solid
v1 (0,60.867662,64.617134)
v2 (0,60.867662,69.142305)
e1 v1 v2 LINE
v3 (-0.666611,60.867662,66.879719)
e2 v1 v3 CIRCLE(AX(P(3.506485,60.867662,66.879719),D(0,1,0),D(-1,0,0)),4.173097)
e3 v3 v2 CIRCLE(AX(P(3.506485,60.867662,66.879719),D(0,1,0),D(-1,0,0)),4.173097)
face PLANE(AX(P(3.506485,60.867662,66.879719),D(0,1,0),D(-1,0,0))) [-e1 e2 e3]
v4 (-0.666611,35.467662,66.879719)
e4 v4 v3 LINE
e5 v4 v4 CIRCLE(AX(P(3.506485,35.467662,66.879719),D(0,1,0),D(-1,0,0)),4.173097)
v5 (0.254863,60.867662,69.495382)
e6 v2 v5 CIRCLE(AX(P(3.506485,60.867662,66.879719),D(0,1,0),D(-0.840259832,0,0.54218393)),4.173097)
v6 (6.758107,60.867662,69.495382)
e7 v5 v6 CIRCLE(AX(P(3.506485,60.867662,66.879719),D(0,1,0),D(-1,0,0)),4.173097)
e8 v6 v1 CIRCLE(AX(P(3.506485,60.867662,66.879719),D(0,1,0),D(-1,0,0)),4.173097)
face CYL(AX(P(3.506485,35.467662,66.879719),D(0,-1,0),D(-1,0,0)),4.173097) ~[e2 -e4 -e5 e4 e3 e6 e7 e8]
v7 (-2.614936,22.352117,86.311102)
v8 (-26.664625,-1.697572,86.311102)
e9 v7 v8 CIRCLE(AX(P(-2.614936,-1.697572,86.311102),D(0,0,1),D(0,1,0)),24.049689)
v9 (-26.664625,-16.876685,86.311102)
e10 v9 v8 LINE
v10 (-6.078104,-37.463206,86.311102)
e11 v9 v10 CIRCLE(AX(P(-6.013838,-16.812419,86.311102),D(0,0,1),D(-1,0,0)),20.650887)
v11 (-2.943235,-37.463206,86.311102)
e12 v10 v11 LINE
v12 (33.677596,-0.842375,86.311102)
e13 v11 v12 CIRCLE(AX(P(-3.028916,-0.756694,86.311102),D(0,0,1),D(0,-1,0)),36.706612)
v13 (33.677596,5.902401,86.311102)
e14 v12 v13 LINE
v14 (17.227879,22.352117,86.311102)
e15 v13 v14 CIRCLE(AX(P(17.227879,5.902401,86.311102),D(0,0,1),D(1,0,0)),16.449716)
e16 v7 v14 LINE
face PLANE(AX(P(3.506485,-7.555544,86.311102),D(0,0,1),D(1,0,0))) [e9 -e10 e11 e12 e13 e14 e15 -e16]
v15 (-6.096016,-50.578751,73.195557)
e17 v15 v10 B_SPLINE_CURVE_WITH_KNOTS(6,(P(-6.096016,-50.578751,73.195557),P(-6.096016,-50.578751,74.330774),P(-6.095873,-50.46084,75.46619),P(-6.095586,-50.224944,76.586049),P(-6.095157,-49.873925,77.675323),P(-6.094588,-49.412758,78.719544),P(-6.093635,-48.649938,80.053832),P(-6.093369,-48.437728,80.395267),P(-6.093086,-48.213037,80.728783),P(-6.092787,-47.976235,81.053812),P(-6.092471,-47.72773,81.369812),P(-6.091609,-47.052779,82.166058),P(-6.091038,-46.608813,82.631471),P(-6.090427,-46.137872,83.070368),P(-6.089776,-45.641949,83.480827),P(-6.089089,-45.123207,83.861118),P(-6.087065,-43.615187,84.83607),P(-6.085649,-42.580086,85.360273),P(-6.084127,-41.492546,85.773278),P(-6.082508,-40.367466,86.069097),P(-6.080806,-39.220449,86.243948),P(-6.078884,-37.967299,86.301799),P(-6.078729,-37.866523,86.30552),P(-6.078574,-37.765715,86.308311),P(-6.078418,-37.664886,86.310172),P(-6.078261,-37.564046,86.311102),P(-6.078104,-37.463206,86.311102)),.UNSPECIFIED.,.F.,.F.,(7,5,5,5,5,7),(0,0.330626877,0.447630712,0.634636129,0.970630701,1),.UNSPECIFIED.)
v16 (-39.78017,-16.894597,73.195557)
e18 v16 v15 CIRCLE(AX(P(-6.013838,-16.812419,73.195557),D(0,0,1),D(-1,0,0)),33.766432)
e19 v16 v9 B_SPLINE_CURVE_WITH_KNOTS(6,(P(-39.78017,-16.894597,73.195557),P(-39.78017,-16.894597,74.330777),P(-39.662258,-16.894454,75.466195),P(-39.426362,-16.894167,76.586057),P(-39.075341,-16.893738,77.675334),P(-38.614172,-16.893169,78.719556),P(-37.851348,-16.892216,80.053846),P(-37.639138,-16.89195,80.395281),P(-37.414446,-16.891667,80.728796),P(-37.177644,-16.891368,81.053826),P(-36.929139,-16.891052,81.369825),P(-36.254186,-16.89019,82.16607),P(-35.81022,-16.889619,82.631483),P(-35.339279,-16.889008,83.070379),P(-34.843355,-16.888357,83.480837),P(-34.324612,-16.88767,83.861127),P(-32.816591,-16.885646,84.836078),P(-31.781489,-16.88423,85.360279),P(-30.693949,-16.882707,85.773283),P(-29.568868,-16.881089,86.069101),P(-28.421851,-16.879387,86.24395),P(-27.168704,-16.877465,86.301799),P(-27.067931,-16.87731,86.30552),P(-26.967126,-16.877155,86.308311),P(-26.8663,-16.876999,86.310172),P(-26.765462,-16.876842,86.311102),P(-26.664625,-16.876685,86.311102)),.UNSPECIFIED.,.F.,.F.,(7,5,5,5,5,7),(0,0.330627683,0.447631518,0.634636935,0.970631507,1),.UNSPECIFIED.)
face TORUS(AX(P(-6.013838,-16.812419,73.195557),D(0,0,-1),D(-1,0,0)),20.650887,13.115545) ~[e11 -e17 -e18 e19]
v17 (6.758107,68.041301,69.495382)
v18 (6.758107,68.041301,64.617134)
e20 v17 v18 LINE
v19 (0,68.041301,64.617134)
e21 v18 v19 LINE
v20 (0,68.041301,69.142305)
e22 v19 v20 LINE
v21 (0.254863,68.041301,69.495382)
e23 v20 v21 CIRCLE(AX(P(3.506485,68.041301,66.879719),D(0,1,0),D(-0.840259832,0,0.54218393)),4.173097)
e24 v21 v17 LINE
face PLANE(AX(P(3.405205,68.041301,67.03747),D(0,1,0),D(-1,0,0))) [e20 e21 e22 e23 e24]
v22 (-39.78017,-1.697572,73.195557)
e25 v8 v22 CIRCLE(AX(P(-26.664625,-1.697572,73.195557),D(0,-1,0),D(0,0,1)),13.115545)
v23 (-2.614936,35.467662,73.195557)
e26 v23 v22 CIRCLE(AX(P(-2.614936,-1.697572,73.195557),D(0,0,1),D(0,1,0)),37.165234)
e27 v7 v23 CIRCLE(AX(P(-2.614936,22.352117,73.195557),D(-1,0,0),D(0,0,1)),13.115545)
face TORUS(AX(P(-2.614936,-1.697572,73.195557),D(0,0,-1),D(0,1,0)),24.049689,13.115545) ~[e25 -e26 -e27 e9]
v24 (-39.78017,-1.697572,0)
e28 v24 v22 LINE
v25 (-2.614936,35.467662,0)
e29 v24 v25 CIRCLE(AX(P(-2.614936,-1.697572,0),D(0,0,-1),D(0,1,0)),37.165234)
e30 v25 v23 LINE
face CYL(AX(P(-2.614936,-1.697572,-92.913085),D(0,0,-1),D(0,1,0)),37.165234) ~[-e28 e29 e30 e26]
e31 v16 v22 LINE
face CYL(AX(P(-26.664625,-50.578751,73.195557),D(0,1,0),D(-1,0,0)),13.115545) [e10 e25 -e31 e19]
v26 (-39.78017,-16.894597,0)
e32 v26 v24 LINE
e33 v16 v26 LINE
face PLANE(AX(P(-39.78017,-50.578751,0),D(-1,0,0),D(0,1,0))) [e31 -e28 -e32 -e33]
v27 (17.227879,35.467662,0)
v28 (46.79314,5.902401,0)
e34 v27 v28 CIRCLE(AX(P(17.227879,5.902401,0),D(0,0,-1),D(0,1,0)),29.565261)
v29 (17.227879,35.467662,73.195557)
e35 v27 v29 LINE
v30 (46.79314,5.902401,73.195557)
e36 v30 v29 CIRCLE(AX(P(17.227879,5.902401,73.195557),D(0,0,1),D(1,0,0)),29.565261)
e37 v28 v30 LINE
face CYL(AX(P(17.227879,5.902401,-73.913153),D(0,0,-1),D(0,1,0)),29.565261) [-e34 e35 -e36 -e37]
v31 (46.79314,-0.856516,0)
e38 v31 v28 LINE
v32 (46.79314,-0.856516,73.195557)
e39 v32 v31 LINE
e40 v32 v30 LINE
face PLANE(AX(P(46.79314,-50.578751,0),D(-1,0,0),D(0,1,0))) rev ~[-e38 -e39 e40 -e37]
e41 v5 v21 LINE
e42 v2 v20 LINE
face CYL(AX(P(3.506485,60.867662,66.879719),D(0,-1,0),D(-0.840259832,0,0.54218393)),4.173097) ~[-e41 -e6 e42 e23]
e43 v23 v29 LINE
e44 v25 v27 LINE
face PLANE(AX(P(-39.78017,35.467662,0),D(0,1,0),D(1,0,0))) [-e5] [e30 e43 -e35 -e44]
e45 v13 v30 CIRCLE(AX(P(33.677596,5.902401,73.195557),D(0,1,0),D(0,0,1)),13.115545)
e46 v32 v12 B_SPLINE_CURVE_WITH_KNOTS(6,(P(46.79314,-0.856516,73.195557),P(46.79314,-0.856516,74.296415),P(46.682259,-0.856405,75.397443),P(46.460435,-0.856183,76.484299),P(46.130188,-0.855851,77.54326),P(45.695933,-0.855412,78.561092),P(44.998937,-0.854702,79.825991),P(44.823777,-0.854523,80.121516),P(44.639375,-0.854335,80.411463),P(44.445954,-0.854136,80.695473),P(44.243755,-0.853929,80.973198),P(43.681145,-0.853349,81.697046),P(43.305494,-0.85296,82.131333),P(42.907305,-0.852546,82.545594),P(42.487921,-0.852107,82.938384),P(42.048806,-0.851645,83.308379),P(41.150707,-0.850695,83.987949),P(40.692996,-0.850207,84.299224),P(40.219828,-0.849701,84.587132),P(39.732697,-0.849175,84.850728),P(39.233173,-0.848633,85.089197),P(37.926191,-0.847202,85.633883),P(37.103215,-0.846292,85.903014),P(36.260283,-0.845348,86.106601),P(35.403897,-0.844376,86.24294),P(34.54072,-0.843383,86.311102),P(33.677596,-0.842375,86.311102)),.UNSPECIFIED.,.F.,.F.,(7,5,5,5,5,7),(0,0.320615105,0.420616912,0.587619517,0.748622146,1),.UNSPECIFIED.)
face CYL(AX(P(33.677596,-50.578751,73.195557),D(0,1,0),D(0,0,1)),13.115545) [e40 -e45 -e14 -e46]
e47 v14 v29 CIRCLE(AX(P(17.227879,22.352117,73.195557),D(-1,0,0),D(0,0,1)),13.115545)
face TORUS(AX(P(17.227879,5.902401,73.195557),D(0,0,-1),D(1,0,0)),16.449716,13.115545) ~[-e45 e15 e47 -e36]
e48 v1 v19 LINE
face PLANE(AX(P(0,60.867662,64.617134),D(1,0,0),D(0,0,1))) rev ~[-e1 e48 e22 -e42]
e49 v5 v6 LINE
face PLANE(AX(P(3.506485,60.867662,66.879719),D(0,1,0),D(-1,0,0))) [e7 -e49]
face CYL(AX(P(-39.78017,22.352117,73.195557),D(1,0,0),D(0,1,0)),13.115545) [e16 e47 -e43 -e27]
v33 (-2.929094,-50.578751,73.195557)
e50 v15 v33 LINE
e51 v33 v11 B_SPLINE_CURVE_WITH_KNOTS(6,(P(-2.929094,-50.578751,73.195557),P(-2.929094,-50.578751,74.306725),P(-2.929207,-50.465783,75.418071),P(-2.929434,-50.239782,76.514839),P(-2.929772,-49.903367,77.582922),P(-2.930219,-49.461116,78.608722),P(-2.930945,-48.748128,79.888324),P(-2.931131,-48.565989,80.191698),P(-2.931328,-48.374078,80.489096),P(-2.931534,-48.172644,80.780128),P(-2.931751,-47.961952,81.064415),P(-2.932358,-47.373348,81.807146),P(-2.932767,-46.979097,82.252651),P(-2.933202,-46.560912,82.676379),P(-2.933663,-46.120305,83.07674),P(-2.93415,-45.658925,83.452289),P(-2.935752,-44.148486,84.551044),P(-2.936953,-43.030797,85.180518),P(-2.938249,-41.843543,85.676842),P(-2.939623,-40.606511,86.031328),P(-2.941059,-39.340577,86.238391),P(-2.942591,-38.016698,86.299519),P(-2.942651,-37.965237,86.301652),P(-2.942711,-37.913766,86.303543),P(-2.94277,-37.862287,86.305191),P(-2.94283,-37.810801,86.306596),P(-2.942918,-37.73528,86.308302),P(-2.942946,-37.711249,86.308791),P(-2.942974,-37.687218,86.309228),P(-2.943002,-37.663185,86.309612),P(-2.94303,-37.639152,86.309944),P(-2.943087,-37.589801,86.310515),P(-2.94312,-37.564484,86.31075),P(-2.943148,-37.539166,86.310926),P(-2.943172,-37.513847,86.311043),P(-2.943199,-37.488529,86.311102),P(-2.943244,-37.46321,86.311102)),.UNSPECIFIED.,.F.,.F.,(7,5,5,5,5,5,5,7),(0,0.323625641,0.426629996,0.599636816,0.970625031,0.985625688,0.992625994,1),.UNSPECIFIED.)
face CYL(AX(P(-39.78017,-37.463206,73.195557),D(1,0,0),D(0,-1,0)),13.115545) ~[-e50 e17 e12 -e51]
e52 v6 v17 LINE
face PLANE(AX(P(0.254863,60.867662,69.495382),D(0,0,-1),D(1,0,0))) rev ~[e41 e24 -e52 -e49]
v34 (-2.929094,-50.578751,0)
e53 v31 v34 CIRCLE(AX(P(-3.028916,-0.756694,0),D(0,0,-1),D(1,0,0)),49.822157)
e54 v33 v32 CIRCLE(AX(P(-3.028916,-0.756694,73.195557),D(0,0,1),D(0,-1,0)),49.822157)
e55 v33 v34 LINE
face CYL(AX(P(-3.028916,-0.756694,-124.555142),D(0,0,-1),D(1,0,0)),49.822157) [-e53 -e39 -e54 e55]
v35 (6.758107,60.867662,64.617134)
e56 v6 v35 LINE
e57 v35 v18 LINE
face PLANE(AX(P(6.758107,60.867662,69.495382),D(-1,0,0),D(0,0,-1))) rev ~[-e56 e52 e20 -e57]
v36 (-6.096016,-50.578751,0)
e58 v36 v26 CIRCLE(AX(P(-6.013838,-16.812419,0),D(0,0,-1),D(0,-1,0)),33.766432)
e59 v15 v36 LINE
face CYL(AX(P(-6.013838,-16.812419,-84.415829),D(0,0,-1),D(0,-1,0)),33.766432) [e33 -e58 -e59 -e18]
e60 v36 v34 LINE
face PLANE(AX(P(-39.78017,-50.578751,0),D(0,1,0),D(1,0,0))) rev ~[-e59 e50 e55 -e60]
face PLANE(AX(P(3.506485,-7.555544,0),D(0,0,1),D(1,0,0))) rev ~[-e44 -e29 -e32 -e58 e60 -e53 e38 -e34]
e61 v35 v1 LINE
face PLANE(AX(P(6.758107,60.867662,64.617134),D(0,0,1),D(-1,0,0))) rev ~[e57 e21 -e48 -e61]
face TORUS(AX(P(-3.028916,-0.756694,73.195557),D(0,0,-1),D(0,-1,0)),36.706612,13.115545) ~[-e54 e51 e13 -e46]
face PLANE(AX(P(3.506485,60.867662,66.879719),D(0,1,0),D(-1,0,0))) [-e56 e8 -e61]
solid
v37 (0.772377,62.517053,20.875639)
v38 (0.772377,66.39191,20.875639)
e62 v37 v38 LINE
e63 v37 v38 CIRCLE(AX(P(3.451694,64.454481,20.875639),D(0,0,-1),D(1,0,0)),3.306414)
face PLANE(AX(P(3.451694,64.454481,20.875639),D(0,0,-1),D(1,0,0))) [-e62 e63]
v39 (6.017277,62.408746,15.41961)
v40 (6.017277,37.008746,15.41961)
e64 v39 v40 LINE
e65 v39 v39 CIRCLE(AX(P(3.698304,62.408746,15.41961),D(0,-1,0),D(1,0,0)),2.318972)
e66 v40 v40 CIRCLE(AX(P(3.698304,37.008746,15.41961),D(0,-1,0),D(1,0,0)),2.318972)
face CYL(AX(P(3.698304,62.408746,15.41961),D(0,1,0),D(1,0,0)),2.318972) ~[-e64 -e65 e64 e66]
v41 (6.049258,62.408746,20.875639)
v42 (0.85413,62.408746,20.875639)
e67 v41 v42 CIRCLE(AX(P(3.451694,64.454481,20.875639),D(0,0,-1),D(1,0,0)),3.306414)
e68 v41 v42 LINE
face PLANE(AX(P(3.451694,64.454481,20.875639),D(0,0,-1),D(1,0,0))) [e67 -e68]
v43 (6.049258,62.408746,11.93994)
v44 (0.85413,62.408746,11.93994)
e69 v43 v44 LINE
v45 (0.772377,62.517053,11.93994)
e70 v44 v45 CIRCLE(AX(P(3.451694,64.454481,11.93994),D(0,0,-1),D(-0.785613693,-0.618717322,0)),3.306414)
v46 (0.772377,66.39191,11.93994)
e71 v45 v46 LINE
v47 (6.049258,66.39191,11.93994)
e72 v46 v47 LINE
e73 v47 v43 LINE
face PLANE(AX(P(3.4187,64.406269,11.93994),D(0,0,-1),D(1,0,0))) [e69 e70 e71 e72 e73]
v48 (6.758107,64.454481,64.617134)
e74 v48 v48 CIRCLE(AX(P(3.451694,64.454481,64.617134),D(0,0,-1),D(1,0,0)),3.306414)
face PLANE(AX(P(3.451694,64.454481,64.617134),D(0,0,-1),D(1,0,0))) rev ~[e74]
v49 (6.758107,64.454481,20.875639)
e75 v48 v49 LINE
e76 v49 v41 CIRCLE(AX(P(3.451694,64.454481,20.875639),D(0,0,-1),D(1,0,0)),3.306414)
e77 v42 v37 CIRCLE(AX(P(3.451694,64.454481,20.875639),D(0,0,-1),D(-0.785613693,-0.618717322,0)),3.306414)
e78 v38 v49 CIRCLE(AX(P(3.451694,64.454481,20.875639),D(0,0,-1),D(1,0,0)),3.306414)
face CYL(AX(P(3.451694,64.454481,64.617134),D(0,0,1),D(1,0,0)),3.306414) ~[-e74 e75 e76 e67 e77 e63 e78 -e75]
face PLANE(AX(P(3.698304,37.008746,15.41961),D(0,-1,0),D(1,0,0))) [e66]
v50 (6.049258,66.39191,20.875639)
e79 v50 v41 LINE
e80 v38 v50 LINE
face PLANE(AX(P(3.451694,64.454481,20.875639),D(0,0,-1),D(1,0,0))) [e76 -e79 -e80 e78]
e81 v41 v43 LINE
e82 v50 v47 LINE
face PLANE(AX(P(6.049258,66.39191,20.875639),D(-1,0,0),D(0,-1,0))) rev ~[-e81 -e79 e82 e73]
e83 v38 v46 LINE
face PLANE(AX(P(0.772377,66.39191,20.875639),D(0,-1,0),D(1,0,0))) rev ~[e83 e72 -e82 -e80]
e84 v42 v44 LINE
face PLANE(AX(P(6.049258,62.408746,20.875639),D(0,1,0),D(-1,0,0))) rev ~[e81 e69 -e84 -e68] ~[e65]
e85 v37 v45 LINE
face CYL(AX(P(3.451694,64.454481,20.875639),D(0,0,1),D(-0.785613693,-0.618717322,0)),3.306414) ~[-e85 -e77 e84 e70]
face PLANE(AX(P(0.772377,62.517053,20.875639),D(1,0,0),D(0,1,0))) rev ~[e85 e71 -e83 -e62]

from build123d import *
from build123d import SkipClean  # not in build123d's __all__

# Parameters (mm, degrees)
F0_W         = 86.5733101964
F0_H         = 86.0464125872
F1_DEPTH     = 86.3111019135
F2_R         = 4.1730965083
F3_DEPTH     = 25.4
F5_DEPTH     = 7.1736387908
F6_R         = 3.3064136906
F7_DEPTH     = 43.7414944172
F9_DEPTH     = 8.9356992394
F10_R        = 2.3189722618
F11_DEPTH    = 25.4
F12_R        = 13.1155446623
F13_T1_DEPTH = 160.2242547154
F13_T4_ANGLE = 90
F14_T1_DEPTH = 179.2241870522
F14_T4_ANGLE = 90
F15_T1_DEPTH = 210.8662437018
F15_T4_ANGLE = 90
F16_T1_DEPTH = 170.7269310844
F16_T4_ANGLE = 90


# Not quite as in the source:
# - a fillet or chamfer that OpenCascade refuses, or shapes differently, is made with other operations: its cross-section is extruded or revolved along the edge and cut away or added


with BuildPart() as f1:
    # F0 (on Top) → F1 (new body)
    with BuildSketch(Plane.XY):
        with Locations((3.5064853728, -7.5555443764)):
            Rectangle(F0_W, F0_H)
    extrude(amount=F1_DEPTH)

    # F2 (on face) → F3 (join)
    with BuildSketch(Plane(origin=(0, 35.4676619172, 0), x_dir=(-1, 0, 0), z_dir=(0, 1, 0))):
        with Locations((-3.5064853728, 66.8797194958)):
            Circle(F2_R)
    extrude(amount=F3_DEPTH)

    # F4 (on face) → F5 (join)
    with BuildSketch(Plane(origin=(0, 60.8676619172, 0), x_dir=(-1, 0, 0), z_dir=(0, 1, 0))):
        with BuildLine():
            Line((-0.2548632519, 69.4953815632), (-6.7581074936, 69.4953815632))
            Line((-6.7581074936, 69.4953815632), (-6.7581074936, 64.6171336304))
            Line((-6.7581074936, 64.6171336304), (0, 64.6171336304))
            Line((0, 64.6171336304), (0, 69.1423053611))
            ThreePointArc((0, 69.1423053611), (-0.1228231667, 69.3221700158), (-0.2548632519, 69.4953815632))
        make_face()
    extrude(amount=F5_DEPTH)

    # F12
    f12_edges = [f1.edges().sort_by_distance(p)[0] for p in [
        (3.506485, 35.467662, 86.311102),
        (-39.78017, -7.555544, 86.311102),
        (3.506485, -50.578751, 86.311102),
        (46.79314, -7.555544, 86.311102),
    ]]
    fillet(f12_edges, radius=F12_R)

    # F13: fillet of radius 29.5652611208 on 1 edges, made by hand

    # F13_s2 → F13_t1 (cut)
    with BuildSketch(Plane.XY.offset(-73.9131528019)):
        with BuildLine():
            ThreePointArc((17.2278793502, 35.4676619172), (38.1336759763, 26.8081974225), (46.793140471, 5.9024007964))
            Line((46.793140471, 5.9024007964), (46.793140471, 35.4676619172))
            Line((46.793140471, 35.4676619172), (17.2278793502, 35.4676619172))
        make_face()
    extrude(amount=F13_T1_DEPTH, mode=Mode.SUBTRACT)

    # F13_s3 → F13_t4 (revolve, cut)
    with BuildSketch(Plane.XZ.offset(-5.9024007964)):
        with BuildLine():
            ThreePointArc((33.6775958086, 86.3111019135), (42.9516863783, 82.4696478208), (46.793140471, 73.1955572511))
            Line((46.793140471, 73.1955572511), (46.793140471, 86.3111019135))
            Line((46.793140471, 86.3111019135), (33.6775958086, 86.3111019135))
        make_face()
    revolve(axis=Axis((17.2278793502, 5.9024007964, 86.3111019135), (0, 0, 1)), revolution_arc=F13_T4_ANGLE, mode=Mode.SUBTRACT)

    # F14: fillet of radius 37.1652340555 on 1 edges, made by hand

    # F14_s2 → F14_t1 (cut)
    with BuildSketch(Plane.XY.offset(-92.9130851387)):
        with BuildLine():
            ThreePointArc((-2.6149356699, 35.4676619172), (-28.8947246949, 24.5822168867), (-39.7801697254, -1.6975721383))
            Line((-39.7801697254, -1.6975721383), (-39.7801697254, 35.4676619172))
            Line((-39.7801697254, 35.4676619172), (-2.6149356699, 35.4676619172))
        make_face()
    extrude(amount=F14_T1_DEPTH, mode=Mode.SUBTRACT)

    # F14_s3 → F14_t4 (revolve, cut)
    with BuildSketch(Plane.YZ.offset(-2.6149356699)):
        with BuildLine():
            ThreePointArc((22.3521172549, 86.3111019135), (31.6262078246, 82.4696478208), (35.4676619172, 73.1955572511))
            Line((35.4676619172, 73.1955572511), (35.4676619172, 86.3111019135))
            Line((35.4676619172, 86.3111019135), (22.3521172549, 86.3111019135))
        make_face()
    with SkipClean():  # cleaning this boolean's faces spoils the solid; the shape is the same uncleaned
        revolve(axis=Axis((-2.6149356699, -1.6975721383, 86.3111019135), (0, 0, 1)), revolution_arc=F14_T4_ANGLE, mode=Mode.SUBTRACT)

    # F15: fillet of radius 49.8221567152 on 1 edges, made by hand

    # F15_s2 → F15_t1 (cut)
    with BuildSketch(Plane.XY.offset(-124.5551417884)):
        with BuildLine():
            ThreePointArc((46.793240471, -0.7566939547), (32.2006686224, -35.9862788214), (-3.0289162443, -50.57885067))
            Line((-3.0289162443, -50.57885067), (-3.0289162443, -51.5752938043))
            ThreePointArc((-3.0289162443, -51.5752938043), (21.8821121134, -51.5751938043), (46.793140471, -51.5751938043))
            Line((46.793140471, -51.5751938043), (47.7895836053, -50.57875067))
            ThreePointArc((47.7895836053, -50.57875067), (47.7895836053, -25.6677223123), (47.7896836053, -0.7566939547))
            Line((47.7896836053, -0.7566939547), (46.793240471, -0.7566939547))
        make_face()
    extrude(amount=F15_T1_DEPTH, mode=Mode.SUBTRACT)

    # F15_s3 → F15_t4 (revolve, cut)
    with BuildSketch(Plane.YZ.offset(-3.0289162443)):
        with BuildLine():
            ThreePointArc((-37.4633060076, 86.3111019135), (-46.7373965773, 82.4696478208), (-50.57885067, 73.1955572511))
            Line((-50.57885067, 73.1955572511), (-50.57885067, 86.3111019135))
            Line((-50.57885067, 86.3111019135), (-37.4633060076, 86.3111019135))
        make_face()
    revolve(axis=Axis((-3.0289162443, -0.7566939547, 86.3111019135), (0, 0, 1)), revolution_arc=F15_T4_ANGLE, mode=Mode.SUBTRACT)

    # F16: fillet of radius 33.7664316682 on 1 edges, made by hand

    # F16_s2 → F16_t1 (cut)
    with BuildSketch(Plane.XY.offset(-84.415829171)):
        with BuildLine():
            ThreePointArc((-6.0138380572, -50.57885067), (-29.8903108663, -40.6888918108), (-39.7802697254, -16.8124190017))
            Line((-39.7802697254, -16.8124190017), (-40.4555983588, -16.8124190017))
            ThreePointArc((-40.4555983588, -16.8124190017), (-40.4554983588, -33.6955848358), (-40.4554983588, -50.57875067))
            Line((-40.4554983588, -50.57875067), (-39.7801697254, -51.2540793033))
            ThreePointArc((-39.7801697254, -51.2540793033), (-22.8970038913, -51.2540793033), (-6.0138380572, -51.2541793033))
            Line((-6.0138380572, -51.2541793033), (-6.0138380572, -50.57885067))
        make_face()
    extrude(amount=F16_T1_DEPTH, mode=Mode.SUBTRACT)

    # F16_s3 → F16_t4 (revolve, cut)
    with BuildSketch(Plane.XZ.offset(16.8124190017)):
        with BuildLine():
            ThreePointArc((-26.6647250631, 86.3111019135), (-35.9388156328, 82.4696478208), (-39.7802697254, 73.1955572511))
            Line((-39.7802697254, 73.1955572511), (-39.7802697254, 86.3111019135))
            Line((-39.7802697254, 86.3111019135), (-26.6647250631, 86.3111019135))
        make_face()
    revolve(axis=Axis((-6.0138380572, -16.8124190017, 86.3111019135), (0, 0, 1)), revolution_arc=F16_T4_ANGLE, mode=Mode.SUBTRACT)


with BuildPart() as f7:
    # F6 (on face) → F7 (new body)
    with BuildSketch(Plane(origin=(0, 0, 64.6171336304), x_dir=(1, 0, 0), z_dir=(0, 0, -1))):
        with Locations((3.4516938031, -64.4544813126)):
            Circle(F6_R)
    extrude(amount=F7_DEPTH)

    # F8 (on face) → F9 (join)
    with BuildSketch(Plane(origin=(0, 0, 20.8756392132), x_dir=(1, 0, 0), z_dir=(0, 0, -1))):
        with BuildLine():
            Line((0.7723765187, -62.5170525055), (0.7723765187, -66.3919101197))
            Line((0.7723765187, -66.3919101197), (6.0492576756, -66.3919101197))
            Line((6.0492576756, -66.3919101197), (6.0492576756, -62.4087458896))
            Line((6.0492576756, -62.4087458896), (0.8541299305, -62.4087458896))
            ThreePointArc((0.8541299305, -62.4087458896), (0.8126975418, -62.4624797498), (0.7723765187, -62.5170525055))
        make_face()
    extrude(amount=F9_DEPTH)

    # F10 (on face) → F11 (join)
    with BuildSketch(Plane.XZ.offset(-62.4087458896)):
        with Locations((3.6983042955, 15.4196098447)):
            Circle(F10_R)
    extrude(amount=F11_DEPTH)


solid = Compound([f1.part, f7.part])
